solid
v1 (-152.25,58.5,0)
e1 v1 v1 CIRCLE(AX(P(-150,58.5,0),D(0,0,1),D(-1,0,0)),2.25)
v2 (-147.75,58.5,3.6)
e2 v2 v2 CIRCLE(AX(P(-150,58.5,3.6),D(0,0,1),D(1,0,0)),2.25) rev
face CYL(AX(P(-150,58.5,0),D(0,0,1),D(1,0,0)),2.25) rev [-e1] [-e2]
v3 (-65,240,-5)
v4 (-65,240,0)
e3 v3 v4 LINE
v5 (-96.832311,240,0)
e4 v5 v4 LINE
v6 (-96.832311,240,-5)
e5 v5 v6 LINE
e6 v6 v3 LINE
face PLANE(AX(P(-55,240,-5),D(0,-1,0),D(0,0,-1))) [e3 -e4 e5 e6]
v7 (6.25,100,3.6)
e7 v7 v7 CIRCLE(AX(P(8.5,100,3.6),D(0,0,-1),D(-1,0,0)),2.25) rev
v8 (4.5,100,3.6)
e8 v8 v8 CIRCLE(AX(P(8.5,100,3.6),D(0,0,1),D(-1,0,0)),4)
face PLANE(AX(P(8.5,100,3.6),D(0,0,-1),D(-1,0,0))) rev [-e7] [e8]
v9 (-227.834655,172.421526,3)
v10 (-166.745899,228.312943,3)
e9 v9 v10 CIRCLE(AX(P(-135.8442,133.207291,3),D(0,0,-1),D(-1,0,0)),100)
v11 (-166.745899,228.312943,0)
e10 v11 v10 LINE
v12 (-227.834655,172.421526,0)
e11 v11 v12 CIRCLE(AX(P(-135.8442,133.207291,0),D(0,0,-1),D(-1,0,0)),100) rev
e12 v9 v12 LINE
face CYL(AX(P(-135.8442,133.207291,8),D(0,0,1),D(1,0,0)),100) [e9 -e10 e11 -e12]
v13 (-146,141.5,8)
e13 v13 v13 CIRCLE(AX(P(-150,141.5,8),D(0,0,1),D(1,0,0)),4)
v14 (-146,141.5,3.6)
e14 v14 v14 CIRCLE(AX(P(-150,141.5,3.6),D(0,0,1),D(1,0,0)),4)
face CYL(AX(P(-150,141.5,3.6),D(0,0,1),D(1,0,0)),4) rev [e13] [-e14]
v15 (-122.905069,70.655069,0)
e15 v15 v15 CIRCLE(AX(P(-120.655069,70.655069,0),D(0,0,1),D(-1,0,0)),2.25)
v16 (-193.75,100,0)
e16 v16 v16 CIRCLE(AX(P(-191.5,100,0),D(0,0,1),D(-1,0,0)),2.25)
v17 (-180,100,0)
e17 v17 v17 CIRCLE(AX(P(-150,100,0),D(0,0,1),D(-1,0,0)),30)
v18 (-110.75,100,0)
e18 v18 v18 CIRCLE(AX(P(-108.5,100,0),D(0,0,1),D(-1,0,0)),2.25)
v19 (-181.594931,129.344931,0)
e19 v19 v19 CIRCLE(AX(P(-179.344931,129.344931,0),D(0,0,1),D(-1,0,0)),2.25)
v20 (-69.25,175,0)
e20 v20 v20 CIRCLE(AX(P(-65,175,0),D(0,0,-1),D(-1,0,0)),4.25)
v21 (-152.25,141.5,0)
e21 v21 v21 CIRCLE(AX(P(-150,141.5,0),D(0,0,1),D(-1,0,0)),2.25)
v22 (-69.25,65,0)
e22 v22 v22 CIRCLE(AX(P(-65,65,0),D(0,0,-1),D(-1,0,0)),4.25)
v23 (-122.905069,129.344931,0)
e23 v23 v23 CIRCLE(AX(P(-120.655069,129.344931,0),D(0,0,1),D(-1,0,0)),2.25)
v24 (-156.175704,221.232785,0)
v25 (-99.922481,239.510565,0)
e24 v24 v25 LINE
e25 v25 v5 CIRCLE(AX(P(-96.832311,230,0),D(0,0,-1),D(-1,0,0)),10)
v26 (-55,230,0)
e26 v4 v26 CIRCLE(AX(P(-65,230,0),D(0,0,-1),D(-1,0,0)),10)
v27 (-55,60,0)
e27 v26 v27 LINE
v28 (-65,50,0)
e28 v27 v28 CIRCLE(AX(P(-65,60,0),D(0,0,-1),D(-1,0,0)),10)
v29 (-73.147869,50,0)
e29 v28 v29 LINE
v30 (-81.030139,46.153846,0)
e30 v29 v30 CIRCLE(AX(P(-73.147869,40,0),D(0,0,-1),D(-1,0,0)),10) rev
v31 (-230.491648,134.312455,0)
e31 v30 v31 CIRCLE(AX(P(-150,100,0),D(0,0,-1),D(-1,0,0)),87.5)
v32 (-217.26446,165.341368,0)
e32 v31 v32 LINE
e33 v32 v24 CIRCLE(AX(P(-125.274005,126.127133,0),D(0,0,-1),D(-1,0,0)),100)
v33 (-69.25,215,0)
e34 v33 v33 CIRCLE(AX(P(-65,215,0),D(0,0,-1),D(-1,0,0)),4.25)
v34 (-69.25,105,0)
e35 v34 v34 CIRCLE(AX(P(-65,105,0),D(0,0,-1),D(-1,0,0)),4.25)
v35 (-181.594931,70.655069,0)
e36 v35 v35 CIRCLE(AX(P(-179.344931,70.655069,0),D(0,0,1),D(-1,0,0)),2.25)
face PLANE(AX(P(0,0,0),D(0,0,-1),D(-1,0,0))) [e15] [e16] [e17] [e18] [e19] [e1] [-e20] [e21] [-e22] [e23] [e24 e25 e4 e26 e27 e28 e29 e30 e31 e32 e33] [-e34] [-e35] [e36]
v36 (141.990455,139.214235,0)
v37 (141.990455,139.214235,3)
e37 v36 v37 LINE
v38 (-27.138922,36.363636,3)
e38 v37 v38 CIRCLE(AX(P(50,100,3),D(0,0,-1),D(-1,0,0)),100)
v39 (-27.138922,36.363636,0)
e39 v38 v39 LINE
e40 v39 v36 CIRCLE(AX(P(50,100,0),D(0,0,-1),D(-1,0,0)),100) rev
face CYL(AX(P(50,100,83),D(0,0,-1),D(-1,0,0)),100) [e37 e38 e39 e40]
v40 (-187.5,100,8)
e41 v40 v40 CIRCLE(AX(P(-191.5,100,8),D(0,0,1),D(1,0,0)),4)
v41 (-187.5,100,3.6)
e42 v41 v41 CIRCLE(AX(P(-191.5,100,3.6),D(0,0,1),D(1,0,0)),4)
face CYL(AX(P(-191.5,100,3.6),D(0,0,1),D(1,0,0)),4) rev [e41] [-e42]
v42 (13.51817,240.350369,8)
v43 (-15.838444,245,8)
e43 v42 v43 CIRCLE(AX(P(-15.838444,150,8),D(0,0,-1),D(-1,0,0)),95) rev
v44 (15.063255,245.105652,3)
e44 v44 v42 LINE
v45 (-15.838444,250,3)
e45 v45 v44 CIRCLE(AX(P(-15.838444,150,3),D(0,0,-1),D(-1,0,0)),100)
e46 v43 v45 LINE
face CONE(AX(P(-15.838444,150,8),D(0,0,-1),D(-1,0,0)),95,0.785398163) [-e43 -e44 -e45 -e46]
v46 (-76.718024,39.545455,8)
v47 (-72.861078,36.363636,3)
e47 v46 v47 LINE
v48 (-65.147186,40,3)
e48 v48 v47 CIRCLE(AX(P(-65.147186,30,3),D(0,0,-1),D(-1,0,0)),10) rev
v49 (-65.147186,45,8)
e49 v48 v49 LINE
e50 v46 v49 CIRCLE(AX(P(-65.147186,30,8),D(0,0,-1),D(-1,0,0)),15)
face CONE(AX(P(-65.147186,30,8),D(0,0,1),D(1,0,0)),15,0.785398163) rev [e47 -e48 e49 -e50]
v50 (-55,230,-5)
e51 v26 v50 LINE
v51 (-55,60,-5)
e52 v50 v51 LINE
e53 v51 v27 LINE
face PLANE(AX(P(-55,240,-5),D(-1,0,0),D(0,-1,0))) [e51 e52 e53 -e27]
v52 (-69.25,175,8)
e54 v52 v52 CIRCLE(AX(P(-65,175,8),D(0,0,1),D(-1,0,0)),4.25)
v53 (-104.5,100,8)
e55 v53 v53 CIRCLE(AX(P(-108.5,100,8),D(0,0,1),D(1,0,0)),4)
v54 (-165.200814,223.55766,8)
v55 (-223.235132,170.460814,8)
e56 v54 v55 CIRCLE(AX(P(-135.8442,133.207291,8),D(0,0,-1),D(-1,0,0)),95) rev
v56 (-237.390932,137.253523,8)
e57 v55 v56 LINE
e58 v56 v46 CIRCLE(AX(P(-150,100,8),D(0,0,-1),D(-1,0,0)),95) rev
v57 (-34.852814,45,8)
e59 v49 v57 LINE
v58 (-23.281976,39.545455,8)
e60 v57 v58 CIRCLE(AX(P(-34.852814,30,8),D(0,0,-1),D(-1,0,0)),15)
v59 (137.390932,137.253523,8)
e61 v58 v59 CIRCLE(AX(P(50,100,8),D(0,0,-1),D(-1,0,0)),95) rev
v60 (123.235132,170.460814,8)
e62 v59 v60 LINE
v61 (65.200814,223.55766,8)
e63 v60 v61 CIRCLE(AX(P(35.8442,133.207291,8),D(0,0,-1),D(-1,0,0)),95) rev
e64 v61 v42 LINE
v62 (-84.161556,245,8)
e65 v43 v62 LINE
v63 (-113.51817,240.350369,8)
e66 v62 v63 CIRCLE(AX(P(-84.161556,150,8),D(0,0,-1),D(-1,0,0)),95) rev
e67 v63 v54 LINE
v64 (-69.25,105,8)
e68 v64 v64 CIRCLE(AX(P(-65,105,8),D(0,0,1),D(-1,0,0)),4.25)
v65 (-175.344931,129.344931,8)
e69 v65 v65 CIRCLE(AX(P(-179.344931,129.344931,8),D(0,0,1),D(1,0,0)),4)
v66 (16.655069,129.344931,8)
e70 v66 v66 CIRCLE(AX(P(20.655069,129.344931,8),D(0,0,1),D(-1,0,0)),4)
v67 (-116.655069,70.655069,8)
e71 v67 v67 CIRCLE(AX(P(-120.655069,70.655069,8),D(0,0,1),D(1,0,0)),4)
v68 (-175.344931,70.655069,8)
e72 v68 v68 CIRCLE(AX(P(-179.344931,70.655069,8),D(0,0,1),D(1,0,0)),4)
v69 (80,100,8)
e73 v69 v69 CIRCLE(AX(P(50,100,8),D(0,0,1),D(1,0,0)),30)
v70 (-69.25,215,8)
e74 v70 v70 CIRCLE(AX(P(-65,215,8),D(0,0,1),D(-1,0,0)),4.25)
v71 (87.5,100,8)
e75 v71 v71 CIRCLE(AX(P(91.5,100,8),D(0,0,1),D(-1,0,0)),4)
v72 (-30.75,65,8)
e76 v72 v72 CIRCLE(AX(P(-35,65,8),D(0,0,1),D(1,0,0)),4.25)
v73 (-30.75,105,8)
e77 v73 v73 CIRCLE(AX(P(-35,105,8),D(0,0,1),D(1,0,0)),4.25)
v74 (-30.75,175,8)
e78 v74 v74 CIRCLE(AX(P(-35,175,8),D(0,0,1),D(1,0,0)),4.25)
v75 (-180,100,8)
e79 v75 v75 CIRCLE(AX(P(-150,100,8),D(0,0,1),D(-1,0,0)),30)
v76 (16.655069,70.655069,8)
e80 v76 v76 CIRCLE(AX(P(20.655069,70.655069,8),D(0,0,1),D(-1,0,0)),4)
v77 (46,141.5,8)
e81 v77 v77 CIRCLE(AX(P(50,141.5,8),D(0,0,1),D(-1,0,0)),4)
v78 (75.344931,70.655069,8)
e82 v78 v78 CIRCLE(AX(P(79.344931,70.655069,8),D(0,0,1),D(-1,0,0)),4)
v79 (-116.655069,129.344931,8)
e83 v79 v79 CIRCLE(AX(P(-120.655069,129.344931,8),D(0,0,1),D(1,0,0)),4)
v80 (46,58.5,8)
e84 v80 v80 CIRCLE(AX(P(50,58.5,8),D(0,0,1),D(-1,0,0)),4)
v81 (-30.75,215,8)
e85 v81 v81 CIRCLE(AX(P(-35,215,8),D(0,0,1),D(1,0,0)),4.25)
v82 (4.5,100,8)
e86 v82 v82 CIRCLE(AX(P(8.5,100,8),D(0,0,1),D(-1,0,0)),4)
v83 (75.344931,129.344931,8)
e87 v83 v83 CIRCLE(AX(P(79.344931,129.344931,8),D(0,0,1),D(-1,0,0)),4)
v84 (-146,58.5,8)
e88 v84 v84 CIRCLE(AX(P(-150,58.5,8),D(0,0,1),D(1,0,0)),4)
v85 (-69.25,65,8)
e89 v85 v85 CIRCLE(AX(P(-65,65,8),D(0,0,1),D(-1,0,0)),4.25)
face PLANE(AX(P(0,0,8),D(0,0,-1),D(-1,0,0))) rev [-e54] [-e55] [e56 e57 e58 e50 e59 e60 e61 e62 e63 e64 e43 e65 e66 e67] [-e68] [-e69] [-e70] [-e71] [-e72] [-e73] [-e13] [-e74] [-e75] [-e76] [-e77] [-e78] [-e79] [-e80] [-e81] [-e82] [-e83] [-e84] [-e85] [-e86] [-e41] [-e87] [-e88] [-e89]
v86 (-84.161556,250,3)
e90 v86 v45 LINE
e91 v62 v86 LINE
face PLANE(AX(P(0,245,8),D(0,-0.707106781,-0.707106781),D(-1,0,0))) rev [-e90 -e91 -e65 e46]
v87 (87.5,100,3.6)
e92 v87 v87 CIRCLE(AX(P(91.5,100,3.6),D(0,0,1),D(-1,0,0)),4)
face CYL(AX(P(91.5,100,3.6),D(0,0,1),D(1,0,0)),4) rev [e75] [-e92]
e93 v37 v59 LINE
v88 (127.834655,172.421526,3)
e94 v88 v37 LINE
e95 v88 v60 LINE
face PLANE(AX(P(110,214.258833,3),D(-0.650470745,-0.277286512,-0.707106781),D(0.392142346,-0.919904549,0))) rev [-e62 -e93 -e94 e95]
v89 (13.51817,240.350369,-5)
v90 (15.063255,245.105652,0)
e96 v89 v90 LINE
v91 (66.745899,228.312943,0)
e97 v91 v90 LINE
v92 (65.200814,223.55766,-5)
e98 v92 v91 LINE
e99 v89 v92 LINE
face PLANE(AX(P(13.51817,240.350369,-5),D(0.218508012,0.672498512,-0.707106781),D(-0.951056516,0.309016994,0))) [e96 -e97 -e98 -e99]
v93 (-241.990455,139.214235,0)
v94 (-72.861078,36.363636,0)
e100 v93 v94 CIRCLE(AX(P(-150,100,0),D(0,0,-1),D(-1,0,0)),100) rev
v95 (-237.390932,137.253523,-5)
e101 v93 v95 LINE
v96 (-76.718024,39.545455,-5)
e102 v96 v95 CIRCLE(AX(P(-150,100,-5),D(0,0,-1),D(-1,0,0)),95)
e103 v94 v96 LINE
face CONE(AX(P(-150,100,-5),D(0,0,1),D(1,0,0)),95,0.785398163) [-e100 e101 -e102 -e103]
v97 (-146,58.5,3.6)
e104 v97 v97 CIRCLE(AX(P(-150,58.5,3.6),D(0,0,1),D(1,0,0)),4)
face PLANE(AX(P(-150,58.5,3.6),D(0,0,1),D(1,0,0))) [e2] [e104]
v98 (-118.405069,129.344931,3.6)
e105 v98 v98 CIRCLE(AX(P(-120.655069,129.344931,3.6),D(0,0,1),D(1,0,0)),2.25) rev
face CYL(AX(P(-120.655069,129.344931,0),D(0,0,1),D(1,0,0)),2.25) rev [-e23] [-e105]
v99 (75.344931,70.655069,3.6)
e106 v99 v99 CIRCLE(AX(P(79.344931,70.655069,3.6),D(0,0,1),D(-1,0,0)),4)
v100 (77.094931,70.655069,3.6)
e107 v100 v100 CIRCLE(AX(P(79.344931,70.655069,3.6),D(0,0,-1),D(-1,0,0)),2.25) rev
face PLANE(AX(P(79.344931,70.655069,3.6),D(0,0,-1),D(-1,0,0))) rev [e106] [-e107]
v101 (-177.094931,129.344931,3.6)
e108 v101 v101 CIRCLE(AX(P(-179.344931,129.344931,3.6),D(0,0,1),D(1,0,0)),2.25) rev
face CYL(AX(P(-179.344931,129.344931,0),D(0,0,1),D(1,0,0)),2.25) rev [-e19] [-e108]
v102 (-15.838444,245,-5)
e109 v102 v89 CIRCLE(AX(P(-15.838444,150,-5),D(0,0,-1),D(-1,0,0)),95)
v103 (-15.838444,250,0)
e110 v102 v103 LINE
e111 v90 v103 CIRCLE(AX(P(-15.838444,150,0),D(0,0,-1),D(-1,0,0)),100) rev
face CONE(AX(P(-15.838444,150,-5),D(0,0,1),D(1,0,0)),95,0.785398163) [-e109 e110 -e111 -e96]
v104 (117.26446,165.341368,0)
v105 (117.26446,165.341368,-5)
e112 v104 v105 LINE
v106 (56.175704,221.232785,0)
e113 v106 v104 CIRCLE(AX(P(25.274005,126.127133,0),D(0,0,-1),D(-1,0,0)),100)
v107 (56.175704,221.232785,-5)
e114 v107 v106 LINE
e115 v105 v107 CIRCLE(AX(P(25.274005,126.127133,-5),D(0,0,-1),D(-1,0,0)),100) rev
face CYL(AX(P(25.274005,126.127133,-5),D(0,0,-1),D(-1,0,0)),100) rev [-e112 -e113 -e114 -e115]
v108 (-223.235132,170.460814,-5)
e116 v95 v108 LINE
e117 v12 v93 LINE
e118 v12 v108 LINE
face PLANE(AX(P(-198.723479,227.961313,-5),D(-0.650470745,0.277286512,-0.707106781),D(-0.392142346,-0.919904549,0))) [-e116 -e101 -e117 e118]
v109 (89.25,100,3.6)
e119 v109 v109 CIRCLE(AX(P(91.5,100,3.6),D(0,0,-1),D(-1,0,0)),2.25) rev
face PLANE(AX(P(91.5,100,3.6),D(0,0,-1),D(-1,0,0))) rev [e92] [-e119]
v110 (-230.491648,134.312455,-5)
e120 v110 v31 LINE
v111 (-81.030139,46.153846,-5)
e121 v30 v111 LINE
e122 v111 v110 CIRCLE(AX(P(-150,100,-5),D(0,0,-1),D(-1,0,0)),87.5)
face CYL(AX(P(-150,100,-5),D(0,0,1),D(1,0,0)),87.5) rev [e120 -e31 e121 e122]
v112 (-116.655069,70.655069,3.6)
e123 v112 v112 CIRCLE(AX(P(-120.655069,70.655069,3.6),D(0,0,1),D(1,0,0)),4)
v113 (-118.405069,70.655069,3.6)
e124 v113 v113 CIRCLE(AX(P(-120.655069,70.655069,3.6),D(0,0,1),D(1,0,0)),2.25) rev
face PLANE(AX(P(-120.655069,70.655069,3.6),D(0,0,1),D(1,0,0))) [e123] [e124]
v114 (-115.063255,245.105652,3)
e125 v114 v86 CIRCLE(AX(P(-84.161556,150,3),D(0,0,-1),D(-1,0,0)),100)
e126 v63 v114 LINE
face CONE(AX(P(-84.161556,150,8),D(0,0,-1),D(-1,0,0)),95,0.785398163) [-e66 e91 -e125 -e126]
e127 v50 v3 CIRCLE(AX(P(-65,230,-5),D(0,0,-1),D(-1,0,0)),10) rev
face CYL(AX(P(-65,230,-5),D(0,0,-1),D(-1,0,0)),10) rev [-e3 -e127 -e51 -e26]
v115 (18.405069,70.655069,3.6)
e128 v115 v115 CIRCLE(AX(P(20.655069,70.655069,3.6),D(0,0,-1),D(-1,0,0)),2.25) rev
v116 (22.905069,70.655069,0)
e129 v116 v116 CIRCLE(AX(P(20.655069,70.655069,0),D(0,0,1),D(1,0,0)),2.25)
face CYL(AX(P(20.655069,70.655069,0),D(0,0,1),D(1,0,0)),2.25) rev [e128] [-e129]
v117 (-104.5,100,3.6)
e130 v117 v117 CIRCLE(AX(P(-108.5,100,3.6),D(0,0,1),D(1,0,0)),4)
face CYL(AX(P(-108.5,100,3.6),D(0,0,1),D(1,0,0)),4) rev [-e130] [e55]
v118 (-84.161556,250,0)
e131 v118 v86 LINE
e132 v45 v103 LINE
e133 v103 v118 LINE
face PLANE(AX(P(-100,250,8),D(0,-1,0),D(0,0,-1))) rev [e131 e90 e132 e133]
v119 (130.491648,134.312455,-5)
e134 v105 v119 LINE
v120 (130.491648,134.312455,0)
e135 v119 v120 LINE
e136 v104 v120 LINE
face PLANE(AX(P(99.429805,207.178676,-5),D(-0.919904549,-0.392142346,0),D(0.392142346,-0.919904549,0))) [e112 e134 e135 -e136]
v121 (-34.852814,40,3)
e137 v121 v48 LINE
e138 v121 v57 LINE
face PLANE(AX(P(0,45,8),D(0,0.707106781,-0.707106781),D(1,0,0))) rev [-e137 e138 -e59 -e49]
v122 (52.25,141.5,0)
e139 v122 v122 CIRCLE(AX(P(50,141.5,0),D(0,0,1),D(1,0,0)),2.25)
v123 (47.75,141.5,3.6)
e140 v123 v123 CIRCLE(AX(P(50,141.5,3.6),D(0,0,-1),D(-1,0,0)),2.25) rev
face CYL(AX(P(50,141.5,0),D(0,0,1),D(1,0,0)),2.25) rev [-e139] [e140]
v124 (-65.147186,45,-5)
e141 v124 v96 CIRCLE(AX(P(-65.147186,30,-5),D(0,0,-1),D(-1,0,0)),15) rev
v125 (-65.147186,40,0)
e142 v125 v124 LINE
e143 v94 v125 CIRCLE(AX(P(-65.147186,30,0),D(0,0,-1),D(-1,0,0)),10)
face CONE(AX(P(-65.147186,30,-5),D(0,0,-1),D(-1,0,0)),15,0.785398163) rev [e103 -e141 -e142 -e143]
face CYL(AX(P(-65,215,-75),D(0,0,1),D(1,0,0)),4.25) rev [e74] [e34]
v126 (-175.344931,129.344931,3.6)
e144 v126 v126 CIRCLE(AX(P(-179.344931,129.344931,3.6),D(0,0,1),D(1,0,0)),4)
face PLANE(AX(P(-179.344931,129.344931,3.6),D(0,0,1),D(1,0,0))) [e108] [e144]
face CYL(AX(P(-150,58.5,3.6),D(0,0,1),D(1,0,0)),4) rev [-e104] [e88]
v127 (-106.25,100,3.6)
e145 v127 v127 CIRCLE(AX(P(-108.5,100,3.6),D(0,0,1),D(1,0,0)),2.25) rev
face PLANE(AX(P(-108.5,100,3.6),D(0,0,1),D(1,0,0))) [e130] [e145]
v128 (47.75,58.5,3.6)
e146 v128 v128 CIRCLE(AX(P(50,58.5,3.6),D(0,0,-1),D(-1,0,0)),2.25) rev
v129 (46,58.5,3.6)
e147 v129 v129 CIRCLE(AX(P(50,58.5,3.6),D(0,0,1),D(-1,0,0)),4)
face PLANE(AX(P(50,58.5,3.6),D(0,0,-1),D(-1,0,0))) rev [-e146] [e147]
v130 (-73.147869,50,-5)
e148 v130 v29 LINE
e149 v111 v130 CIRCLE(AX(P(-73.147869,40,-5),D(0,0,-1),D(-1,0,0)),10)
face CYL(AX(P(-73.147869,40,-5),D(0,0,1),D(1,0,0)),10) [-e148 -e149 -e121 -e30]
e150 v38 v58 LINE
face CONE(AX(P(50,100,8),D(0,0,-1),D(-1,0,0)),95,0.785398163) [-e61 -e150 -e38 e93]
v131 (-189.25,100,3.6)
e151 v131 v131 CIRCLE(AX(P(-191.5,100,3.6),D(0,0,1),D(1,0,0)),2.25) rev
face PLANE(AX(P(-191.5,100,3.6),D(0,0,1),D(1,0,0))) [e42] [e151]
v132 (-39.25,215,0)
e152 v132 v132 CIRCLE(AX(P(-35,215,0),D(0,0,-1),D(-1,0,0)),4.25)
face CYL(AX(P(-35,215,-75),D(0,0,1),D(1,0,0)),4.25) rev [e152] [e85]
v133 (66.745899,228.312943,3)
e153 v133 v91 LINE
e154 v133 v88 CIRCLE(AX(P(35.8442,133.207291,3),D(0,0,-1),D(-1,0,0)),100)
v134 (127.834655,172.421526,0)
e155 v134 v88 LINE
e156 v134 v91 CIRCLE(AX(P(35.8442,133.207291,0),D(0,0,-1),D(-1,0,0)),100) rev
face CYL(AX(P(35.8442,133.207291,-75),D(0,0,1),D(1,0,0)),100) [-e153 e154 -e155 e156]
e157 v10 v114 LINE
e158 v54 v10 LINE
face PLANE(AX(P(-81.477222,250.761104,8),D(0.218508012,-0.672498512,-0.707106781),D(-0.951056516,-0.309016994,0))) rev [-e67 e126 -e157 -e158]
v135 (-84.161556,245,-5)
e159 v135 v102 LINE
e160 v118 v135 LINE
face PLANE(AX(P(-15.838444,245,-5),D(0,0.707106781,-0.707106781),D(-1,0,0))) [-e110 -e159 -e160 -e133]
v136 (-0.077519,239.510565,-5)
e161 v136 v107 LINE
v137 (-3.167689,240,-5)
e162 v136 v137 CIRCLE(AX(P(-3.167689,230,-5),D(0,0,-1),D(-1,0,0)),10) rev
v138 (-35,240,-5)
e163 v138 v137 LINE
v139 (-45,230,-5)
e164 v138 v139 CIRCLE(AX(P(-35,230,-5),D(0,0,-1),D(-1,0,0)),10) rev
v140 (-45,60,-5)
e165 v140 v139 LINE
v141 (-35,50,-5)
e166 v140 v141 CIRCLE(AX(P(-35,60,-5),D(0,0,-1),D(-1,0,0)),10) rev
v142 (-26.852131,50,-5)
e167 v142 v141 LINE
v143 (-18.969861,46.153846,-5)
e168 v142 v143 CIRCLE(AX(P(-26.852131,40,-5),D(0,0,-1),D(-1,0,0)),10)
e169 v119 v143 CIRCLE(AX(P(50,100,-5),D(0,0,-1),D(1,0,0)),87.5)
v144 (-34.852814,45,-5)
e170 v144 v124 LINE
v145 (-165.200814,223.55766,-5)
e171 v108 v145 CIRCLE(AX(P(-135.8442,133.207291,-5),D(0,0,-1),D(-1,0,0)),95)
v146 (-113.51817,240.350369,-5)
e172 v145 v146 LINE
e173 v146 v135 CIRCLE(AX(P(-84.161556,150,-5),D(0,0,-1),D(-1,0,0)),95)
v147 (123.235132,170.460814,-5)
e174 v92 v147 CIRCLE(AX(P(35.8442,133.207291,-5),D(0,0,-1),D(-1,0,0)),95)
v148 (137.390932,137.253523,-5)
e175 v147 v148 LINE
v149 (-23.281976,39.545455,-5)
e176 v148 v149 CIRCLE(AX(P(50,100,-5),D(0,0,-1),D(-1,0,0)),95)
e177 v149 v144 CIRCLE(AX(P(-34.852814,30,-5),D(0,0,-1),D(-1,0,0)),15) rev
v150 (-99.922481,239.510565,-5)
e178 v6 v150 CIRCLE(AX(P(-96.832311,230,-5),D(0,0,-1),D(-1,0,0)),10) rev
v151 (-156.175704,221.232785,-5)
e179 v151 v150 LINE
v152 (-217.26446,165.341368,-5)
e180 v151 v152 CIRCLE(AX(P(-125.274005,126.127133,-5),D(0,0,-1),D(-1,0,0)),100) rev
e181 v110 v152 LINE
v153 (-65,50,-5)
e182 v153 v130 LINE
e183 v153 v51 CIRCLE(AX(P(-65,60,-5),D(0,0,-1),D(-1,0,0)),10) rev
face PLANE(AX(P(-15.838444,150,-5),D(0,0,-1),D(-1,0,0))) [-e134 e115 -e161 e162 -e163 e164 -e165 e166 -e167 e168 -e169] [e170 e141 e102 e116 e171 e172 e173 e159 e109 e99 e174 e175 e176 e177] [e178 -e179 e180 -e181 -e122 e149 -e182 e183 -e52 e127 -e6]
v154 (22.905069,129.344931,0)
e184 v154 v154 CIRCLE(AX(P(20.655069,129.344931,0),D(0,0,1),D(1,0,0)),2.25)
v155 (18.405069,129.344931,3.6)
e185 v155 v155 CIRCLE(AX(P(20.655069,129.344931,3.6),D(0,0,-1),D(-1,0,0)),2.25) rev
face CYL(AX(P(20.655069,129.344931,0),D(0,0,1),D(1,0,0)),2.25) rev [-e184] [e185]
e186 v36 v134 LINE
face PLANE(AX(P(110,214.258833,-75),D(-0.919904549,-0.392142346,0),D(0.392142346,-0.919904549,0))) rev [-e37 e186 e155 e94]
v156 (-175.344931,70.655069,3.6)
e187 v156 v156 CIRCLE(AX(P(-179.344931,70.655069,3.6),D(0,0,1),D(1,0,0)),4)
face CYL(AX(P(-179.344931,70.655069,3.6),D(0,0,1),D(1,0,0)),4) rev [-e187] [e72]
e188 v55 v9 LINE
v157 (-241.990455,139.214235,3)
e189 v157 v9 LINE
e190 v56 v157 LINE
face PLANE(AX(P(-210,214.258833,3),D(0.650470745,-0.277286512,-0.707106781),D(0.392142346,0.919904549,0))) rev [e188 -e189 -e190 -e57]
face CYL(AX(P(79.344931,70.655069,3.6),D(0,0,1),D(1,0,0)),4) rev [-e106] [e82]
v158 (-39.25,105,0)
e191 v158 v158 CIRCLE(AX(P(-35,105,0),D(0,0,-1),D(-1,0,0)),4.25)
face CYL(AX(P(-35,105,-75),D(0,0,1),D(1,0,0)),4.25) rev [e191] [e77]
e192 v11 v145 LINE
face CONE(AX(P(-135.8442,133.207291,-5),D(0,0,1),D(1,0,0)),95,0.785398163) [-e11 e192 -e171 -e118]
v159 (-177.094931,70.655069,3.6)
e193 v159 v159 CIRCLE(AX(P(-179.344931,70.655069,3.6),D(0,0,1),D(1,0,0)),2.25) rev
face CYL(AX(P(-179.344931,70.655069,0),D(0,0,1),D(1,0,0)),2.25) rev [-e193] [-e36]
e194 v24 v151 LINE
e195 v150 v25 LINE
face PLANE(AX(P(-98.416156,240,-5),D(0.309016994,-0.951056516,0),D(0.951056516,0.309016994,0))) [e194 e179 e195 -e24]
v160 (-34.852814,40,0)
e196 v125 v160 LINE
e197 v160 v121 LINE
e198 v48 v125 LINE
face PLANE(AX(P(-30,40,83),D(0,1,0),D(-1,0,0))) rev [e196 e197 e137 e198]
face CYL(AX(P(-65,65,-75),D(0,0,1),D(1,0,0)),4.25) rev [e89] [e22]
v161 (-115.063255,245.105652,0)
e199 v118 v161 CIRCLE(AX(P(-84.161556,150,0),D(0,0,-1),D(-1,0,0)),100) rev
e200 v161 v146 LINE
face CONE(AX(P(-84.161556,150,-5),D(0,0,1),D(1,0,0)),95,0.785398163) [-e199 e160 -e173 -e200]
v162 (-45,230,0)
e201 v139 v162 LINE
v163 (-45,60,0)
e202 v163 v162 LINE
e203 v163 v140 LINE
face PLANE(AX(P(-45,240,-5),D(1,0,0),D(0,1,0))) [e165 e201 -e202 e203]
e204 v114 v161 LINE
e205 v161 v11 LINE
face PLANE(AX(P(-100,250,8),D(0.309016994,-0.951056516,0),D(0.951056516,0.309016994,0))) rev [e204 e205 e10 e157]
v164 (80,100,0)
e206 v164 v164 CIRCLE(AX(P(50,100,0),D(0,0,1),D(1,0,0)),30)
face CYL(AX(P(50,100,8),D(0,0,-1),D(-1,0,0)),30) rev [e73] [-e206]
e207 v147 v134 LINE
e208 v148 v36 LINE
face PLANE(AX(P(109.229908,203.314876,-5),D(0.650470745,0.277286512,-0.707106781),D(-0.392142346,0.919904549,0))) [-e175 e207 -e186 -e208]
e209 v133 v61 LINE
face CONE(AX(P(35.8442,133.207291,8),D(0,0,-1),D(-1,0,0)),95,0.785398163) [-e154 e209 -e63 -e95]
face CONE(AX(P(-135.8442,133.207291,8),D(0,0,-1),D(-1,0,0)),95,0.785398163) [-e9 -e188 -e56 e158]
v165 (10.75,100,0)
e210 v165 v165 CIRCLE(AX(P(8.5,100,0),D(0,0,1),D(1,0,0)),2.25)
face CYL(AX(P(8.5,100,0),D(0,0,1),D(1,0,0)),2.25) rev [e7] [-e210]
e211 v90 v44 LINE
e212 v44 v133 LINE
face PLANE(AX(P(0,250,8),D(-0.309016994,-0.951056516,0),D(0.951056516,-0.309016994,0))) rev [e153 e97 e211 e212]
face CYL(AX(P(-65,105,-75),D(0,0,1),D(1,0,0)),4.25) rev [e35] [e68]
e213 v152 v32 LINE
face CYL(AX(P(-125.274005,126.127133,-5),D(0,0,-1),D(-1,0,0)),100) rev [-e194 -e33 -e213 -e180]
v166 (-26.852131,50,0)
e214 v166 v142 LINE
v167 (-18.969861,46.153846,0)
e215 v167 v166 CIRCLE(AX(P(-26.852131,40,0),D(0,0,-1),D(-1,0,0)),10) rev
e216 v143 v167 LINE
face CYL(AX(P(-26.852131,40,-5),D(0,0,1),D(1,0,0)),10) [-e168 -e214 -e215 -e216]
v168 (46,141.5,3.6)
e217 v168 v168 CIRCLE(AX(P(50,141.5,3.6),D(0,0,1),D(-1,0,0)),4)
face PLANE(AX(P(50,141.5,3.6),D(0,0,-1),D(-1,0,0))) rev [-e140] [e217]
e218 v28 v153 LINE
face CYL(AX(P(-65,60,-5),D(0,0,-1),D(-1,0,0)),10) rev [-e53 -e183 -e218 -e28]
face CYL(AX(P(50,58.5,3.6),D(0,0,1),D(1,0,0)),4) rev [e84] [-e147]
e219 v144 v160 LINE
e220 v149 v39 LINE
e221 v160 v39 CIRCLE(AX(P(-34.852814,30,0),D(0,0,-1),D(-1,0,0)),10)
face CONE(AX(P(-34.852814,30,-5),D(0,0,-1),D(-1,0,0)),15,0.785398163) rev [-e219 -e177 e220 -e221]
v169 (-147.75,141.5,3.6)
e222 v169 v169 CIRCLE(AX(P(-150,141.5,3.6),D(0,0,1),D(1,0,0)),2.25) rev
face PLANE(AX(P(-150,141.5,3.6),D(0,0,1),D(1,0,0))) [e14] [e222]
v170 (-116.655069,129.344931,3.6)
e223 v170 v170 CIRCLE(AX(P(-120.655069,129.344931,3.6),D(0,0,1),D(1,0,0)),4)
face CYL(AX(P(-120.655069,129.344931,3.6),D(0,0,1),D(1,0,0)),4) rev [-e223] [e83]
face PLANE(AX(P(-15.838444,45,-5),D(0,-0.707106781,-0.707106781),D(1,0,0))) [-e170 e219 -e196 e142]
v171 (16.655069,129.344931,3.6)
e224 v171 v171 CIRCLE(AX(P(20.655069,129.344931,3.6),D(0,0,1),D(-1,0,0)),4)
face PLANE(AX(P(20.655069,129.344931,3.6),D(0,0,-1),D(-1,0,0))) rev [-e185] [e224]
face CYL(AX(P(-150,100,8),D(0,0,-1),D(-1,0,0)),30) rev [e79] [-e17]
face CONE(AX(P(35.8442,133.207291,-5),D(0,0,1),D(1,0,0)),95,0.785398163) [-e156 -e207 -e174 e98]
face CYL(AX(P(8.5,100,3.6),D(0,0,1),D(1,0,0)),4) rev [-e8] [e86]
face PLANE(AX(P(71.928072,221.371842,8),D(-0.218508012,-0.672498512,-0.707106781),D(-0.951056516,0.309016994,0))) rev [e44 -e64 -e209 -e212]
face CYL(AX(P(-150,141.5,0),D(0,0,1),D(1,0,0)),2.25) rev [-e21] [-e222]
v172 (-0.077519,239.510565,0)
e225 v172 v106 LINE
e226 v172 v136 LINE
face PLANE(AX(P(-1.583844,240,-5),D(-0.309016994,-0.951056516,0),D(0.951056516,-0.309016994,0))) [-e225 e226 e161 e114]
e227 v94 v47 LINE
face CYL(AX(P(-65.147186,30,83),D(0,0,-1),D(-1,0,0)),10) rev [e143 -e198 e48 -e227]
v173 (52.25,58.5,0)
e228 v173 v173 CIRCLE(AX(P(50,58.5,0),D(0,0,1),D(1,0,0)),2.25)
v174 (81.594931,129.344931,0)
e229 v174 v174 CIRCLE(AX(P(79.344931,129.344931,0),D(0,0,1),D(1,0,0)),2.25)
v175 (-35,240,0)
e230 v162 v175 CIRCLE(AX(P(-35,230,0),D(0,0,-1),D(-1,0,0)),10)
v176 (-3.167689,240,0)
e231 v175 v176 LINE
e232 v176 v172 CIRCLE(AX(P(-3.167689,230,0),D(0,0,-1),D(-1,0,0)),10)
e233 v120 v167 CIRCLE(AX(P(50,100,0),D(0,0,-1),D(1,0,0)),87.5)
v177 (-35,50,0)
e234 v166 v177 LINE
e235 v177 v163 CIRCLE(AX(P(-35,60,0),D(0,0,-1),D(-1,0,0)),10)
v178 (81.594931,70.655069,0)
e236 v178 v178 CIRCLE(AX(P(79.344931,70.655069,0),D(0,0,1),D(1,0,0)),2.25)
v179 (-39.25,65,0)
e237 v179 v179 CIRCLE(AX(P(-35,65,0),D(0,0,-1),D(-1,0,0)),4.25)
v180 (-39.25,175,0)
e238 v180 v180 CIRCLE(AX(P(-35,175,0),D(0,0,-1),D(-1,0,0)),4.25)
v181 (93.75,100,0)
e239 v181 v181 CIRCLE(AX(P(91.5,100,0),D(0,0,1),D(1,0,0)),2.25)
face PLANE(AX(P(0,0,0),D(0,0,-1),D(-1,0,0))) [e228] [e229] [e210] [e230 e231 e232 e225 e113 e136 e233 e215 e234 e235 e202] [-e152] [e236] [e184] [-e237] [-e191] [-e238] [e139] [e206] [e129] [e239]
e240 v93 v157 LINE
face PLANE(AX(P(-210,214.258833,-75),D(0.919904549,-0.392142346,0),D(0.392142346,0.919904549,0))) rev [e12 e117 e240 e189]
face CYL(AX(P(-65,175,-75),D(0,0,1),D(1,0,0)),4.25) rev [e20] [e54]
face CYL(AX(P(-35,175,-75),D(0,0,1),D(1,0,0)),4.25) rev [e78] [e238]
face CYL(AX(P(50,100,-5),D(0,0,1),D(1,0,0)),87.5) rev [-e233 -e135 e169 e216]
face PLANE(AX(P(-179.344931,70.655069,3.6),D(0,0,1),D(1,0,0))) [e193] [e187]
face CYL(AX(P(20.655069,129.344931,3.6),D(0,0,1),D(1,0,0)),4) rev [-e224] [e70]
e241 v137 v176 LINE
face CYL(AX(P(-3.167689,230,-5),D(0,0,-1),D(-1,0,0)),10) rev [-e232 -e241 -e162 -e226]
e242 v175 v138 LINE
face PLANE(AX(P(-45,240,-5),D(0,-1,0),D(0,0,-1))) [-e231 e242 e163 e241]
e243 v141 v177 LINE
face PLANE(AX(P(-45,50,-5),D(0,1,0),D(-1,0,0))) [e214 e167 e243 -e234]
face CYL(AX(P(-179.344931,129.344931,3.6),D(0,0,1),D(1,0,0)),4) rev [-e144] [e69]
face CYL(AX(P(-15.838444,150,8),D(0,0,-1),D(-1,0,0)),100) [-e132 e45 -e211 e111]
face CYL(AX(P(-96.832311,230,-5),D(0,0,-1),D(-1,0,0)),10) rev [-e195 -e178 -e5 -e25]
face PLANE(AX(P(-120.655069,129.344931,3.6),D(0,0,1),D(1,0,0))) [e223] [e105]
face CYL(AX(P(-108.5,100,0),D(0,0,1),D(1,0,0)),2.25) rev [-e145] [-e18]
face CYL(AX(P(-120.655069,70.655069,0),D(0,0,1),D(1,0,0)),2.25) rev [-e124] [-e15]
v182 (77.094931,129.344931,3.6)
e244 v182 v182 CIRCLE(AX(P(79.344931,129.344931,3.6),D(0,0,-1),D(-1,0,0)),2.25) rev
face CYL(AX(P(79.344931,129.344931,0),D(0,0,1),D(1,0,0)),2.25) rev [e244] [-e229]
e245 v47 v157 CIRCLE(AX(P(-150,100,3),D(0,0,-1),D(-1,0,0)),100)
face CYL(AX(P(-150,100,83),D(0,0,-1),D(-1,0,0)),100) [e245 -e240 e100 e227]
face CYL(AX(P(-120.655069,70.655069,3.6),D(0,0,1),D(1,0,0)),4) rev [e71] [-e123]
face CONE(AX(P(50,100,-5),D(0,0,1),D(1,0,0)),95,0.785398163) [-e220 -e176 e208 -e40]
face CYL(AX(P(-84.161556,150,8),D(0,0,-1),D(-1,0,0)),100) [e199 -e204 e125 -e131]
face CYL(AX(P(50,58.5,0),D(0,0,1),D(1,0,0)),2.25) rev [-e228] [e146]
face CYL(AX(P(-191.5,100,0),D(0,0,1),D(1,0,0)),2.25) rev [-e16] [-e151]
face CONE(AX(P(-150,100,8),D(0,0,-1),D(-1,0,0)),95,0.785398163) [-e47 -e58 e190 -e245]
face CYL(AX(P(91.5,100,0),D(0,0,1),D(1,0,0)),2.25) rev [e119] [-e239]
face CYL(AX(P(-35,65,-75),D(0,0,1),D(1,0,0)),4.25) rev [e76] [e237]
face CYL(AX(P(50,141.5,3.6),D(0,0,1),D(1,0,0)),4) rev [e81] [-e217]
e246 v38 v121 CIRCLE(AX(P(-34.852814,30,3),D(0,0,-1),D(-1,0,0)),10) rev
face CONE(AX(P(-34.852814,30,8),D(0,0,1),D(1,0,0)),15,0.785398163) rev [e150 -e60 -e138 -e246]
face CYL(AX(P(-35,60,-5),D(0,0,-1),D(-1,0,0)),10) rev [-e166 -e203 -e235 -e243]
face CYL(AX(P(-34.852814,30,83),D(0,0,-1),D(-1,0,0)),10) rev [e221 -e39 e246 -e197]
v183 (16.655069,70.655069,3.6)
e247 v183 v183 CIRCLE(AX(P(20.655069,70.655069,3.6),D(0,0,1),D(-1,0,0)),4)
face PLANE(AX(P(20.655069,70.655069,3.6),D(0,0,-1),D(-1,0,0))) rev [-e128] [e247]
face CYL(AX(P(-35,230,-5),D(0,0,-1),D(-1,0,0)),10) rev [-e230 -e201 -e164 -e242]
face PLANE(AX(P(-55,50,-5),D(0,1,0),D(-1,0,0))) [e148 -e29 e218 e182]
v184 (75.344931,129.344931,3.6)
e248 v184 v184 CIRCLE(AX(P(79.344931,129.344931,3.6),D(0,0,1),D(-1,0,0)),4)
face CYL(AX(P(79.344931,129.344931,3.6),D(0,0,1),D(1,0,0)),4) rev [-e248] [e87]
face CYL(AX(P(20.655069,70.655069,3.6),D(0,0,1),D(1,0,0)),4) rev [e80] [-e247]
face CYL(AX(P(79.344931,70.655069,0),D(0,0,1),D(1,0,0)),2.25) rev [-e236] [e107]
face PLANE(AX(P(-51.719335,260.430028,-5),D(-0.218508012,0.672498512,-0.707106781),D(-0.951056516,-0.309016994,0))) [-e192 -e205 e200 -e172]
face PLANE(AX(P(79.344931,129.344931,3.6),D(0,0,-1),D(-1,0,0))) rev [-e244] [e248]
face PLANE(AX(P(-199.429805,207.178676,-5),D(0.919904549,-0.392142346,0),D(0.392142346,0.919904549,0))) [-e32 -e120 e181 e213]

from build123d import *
from build123d.topology import SkipClean

# Parameters (mm, degrees)
SKETCH_1_R               = 30
EXTRUDE_1_DEPTH          = 8
CUT_EXTRUDE_5_DEPTH      = 905.685953271
CUT_EXTRUDE_5_DEPTH_BACK = 905.685953271
SKETCH_8_R               = 2.25
SKETCH_9_R               = 4
CUT_EXTRUDE_6_DEPTH      = 4.4
FILLET_1_R               = 100
CUT_EXTRUDE_7_DEPTH      = 83
CUT_EXTRUDE_8_DEPTH      = 83
FILLET_3_R               = 100
FILLET_4_R               = 10
SKETCH_14_R              = 4.25
CUT_EXTRUDE_9_DEPTH      = 83
EXTRUDE_2_DEPTH          = 5
FILLET_6_R               = 100
FILLET_7_R               = 10
CHAMFER_1_SIZE           = 5


with BuildPart() as part:
    # 草图1 → 凸台-拉伸1 (new body)
    with BuildSketch(Plane.XY):
        Polygon((0, 250), (769.420884294, 0), (0, 0), (-100, 0), (-869.420884294, 0), (-100, 250), align=None)
        with Locations((50, 100)):
            Circle(SKETCH_1_R, mode=Mode.SUBTRACT)
        with Locations(Location((-150, 100, 0), (0, 0, 180))):
            Circle(SKETCH_1_R, mode=Mode.SUBTRACT)
    extrude(amount=EXTRUDE_1_DEPTH)

    # 草图8 → 切除-拉伸5 (cut, two sides: drawn at the far end of the back side and taken through both)
    with BuildSketch(Plane.XY.offset(8).offset(-CUT_EXTRUDE_5_DEPTH_BACK)):
        with Locations((50, 141.5)):
            Circle(SKETCH_8_R)
        with Locations((79.344931419, 129.344931419)):
            Circle(SKETCH_8_R)
        with Locations((91.5, 100)):
            Circle(SKETCH_8_R)
        with Locations((79.344931419, 70.655068581)):
            Circle(SKETCH_8_R)
        with Locations((50, 58.5)):
            Circle(SKETCH_8_R)
        with Locations((20.655068581, 70.655068581)):
            Circle(SKETCH_8_R)
        with Locations((8.5, 100)):
            Circle(SKETCH_8_R)
        with Locations((20.655068581, 129.344931419)):
            Circle(SKETCH_8_R)
        with Locations(Location((-120.655068581, 129.344931419, 0), (0, 0, 180))):
            Circle(SKETCH_8_R)
        with Locations(Location((-108.5, 100, 0), (0, 0, 180))):
            Circle(SKETCH_8_R)
        with Locations(Location((-120.655068581, 70.655068581, 0), (0, 0, 180))):
            Circle(SKETCH_8_R)
        with Locations(Location((-150, 58.5, 0), (0, 0, 180))):
            Circle(SKETCH_8_R)
        with Locations(Location((-179.344931419, 70.655068581, 0), (0, 0, 180))):
            Circle(SKETCH_8_R)
        with Locations(Location((-191.5, 100, 0), (0, 0, 180))):
            Circle(SKETCH_8_R)
        with Locations(Location((-179.344931419, 129.344931419, 0), (0, 0, 180))):
            Circle(SKETCH_8_R)
        with Locations(Location((-150, 141.5, 0), (0, 0, 180))):
            Circle(SKETCH_8_R)
    extrude(amount=CUT_EXTRUDE_5_DEPTH + CUT_EXTRUDE_5_DEPTH_BACK, mode=Mode.SUBTRACT)

    # 草图9 → 切除-拉伸6 (cut)
    with BuildSketch(Plane.XY.offset(8)):
        with Locations((-150, 141.5)):
            Circle(SKETCH_9_R)
        with Locations((-120.655068581, 129.344931419)):
            Circle(SKETCH_9_R)
        with Locations((-108.5, 100)):
            Circle(SKETCH_9_R)
        with Locations((-120.655068581, 70.655068581)):
            Circle(SKETCH_9_R)
        with Locations((-150, 58.5)):
            Circle(SKETCH_9_R)
        with Locations((-179.344931419, 70.655068581)):
            Circle(SKETCH_9_R)
        with Locations((-191.5, 100)):
            Circle(SKETCH_9_R)
        with Locations((-179.344931419, 129.344931419)):
            Circle(SKETCH_9_R)
        with Locations(Location((79.344931419, 129.344931419, 0), (0, 0, 180))):
            Circle(SKETCH_9_R)
        with Locations(Location((91.5, 100, 0), (0, 0, 180))):
            Circle(SKETCH_9_R)
        with Locations(Location((79.344931419, 70.655068581, 0), (0, 0, 180))):
            Circle(SKETCH_9_R)
        with Locations(Location((50, 58.5, 0), (0, 0, 180))):
            Circle(SKETCH_9_R)
        with Locations(Location((20.655068581, 70.655068581, 0), (0, 0, 180))):
            Circle(SKETCH_9_R)
        with Locations(Location((8.5, 100, 0), (0, 0, 180))):
            Circle(SKETCH_9_R)
        with Locations(Location((20.655068581, 129.344931419, 0), (0, 0, 180))):
            Circle(SKETCH_9_R)
        with Locations(Location((50, 141.5, 0), (0, 0, 180))):
            Circle(SKETCH_9_R)
    extrude(amount=-CUT_EXTRUDE_6_DEPTH, mode=Mode.SUBTRACT)

    # 圆角1
    fillet_1_edges = [part.edges().sort_by_distance(p)[0] for p in [
        (-869.420884294, 0, 4),
        (769.420884294, 0, 4),
    ]]
    fillet(fillet_1_edges, radius=FILLET_1_R)

    # 草图12 → 切除-拉伸7 (cut)
    with BuildSketch(Plane(origin=(0, 0, 0), x_dir=(-1, 0, 0), z_dir=(0, 0, -1))):
        with BuildLine():
            Line((30, 40), (70, 40))
            ThreePointArc((70, 40), (105.27864045, 10.5572809), (150, 0))
            Line((150, 0), (-50, 0))
            ThreePointArc((-50, 0), (-5.27864045, 10.5572809), (30, 40))
        make_face()
    extrude(amount=-CUT_EXTRUDE_7_DEPTH, mode=Mode.SUBTRACT)

    # 草图13 → 切除-拉伸8 (cut)
    with BuildSketch(Plane.XY.offset(8)):
        with BuildLine():
            Line((-238.045732826, 0), (-150, 0))
            ThreePointArc((-150, 0), (-233.430879966, 44.870259677), (-241.990454949, 139.214234639))
            Line((-241.990454949, 139.214234639), (-210, 214.258833414))
            Line((-210, 214.258833414), (-268.947432264, 195.10565163))
            ThreePointArc((-268.947432264, 195.10565163), (-336.814566886, 84.356553496), (-238.045732826, 0))
        make_face()
        with BuildLine():
            Line((110, 214.258833414), (168.947432264, 195.10565163))
            ThreePointArc((168.947432264, 195.10565163), (236.814566886, 84.356553496), (138.045732826, 0))
            Line((138.045732826, 0), (50, 0))
            ThreePointArc((50, 0), (133.430879966, 44.870259677), (141.990454949, 139.214234639))
            Line((141.990454949, 139.214234639), (110, 214.258833414))
        make_face()
    extrude(amount=-CUT_EXTRUDE_8_DEPTH, mode=Mode.SUBTRACT)

    # 圆角3
    fillet_3_edges = [part.edges().sort_by_distance(p)[0] for p in [
        (-100, 250, 4),
        (0, 250, 4),
        (-210, 214.258833414, 4),
        (110, 214.258833414, 4),
    ]]
    fillet(fillet_3_edges, radius=FILLET_3_R)

    # 圆角4
    fillet_4_edges = [part.edges().sort_by_distance(p)[0] for p in [
        (-30, 40, 4),
        (-70, 40, 4),
    ]]
    fillet(fillet_4_edges, radius=FILLET_4_R)

    # 草图14 → 切除-拉伸9 (cut)
    with BuildSketch(Plane.XY.offset(8)):
        with Locations((-35, 65)):
            Circle(SKETCH_14_R)
        with Locations((-35, 105)):
            Circle(SKETCH_14_R)
        with Locations((-35, 175)):
            Circle(SKETCH_14_R)
        with Locations((-35, 215)):
            Circle(SKETCH_14_R)
        with Locations(Location((-65, 215, 0), (0, 0, 180))):
            Circle(SKETCH_14_R)
        with Locations(Location((-65, 175, 0), (0, 0, 180))):
            Circle(SKETCH_14_R)
        with Locations(Location((-65, 105, 0), (0, 0, 180))):
            Circle(SKETCH_14_R)
        with Locations(Location((-65, 65, 0), (0, 0, 180))):
            Circle(SKETCH_14_R)
    extrude(amount=-CUT_EXTRUDE_9_DEPTH, mode=Mode.SUBTRACT)

    # 草图15 → 凸台-拉伸2 (add)
    with SkipClean():  # the faces are left unmerged after this step: merging them gives an invalid solid
        with BuildSketch(Plane(origin=(0, 0, 0), x_dir=(-1, 0, 0), z_dir=(0, 0, -1))):
            with BuildLine():
                Line((-15.063255405, 245.10565163), (-66.7458992, 228.312942707))
                ThreePointArc((-66.7458992, 228.312942707), (-103.346666574, 206.986807031), (-127.834654711, 172.421525717))
                Line((-127.834654711, 172.421525717), (-141.990454949, 139.214234639))
                ThreePointArc((-141.990454949, 139.214234639), (-101.958670135, 14.558226857), (27.138921584, 36.363636364))
                ThreePointArc((27.138921584, 36.363636364), (30.588799415, 39.045340337), (34.852813742, 40))
                Line((34.852813742, 40), (65.147186258, 40))
                ThreePointArc((65.147186258, 40), (69.411200585, 39.045340337), (72.861078416, 36.363636364))
                ThreePointArc((72.861078416, 36.363636364), (201.958670135, 14.558226857), (241.990454949, 139.214234639))
                Line((241.990454949, 139.214234639), (227.834654711, 172.421525717))
                ThreePointArc((227.834654711, 172.421525717), (203.346666574, 206.986807031), (166.7458992, 228.312942707))
                Line((166.7458992, 228.312942707), (115.063255405, 245.10565163))
                ThreePointArc((115.063255405, 245.10565163), (99.805002472, 248.76883406), (84.161555968, 250))
                Line((84.161555968, 250), (15.838444032, 250))
                ThreePointArc((15.838444032, 250), (0.194997528, 248.76883406), (-15.063255405, 245.10565163))
            make_face()
            with BuildLine():
                Line((55, 50), (78.192966918, 50))
                ThreePointArc((78.192966918, 50), (192.379277536, 23.447750944), (230.49164808, 134.312455309))
                Line((230.49164808, 134.312455309), (199.429805152, 207.178675671))
                Line((199.429805152, 207.178675671), (98.416155597, 240))
                Line((98.416155597, 240), (55, 240))
                Line((55, 240), (55, 50))
            make_face(mode=Mode.SUBTRACT)
            with BuildLine():
                Line((45, 240), (45, 50))
                Line((45, 50), (21.807033082, 50))
                ThreePointArc((21.807033082, 50), (-92.379277536, 23.447750944), (-130.49164808, 134.312455309))
                Line((-130.49164808, 134.312455309), (-99.429805152, 207.178675671))
                Line((-99.429805152, 207.178675671), (1.583844403, 240))
                Line((1.583844403, 240), (45, 240))
            make_face(mode=Mode.SUBTRACT)
        extrude(amount=EXTRUDE_2_DEPTH)

    # 圆角6
    fillet_6_edges = [part.edges().sort_by_distance(p)[0] for p in [
        (-199.429805152, 207.178675671, -2.5),
        (99.429805152, 207.178675671, -2.5),
    ]]
    fillet(fillet_6_edges, radius=FILLET_6_R)

    # 圆角7
    fillet_7_edges = [part.edges().sort_by_distance(p)[0] for p in [
        (-98.416155597, 240, -2.5),
        (-55, 240, -2.5),
        (-55, 50, -2.5),
        (-78.192966918, 50, -2.5),
        (-21.807033082, 50, -2.5),
        (-45, 50, -2.5),
        (-45, 240, -2.5),
        (-1.583844403, 240, -2.5),
    ]]
    fillet(fillet_7_edges, radius=FILLET_7_R)

    # 倒角1
    chamfer_1_edges = [part.edges().sort_by_distance(p)[0] for p in [
        (-201.958670135, 14.558226857, 8),
        (-234.91255483, 155.817880178, 8),
        (134.91255483, 155.817880178, 8),
        (-140.904577302, 236.709297168, 8),
        (40.904577302, 236.709297168, 8),
        (-50, 250, 8),
        (-203.346666574, 206.986807031, 8),
        (-99.805002472, 248.76883406, 8),
        (-0.194997528, 248.76883406, 8),
        (103.346666574, 206.986807031, 8),
        (101.958670135, 14.558226857, 8),
        (-50, 40, 8),
        (-30.588799415, 39.045340337, 8),
        (-69.411200585, 39.045340337, 8),
        (-0.194997528, 248.76883406, -5),
        (40.904577302, 236.709297168, -5),
        (103.346666574, 206.986807031, -5),
        (134.91255483, 155.817880178, -5),
        (101.958670135, 14.558226857, -5),
        (-30.588799415, 39.045340337, -5),
        (-50, 40, -5),
        (-69.411200585, 39.045340337, -5),
        (-201.958670135, 14.558226857, -5),
        (-234.91255483, 155.817880178, -5),
        (-203.346666574, 206.986807031, -5),
        (-140.904577302, 236.709297168, -5),
        (-99.805002472, 248.76883406, -5),
        (-50, 250, -5),
    ]]
    chamfer(chamfer_1_edges, length=CHAMFER_1_SIZE - 0.0001)  # a hair under: the kernel refuses the full size


solid = part.part
